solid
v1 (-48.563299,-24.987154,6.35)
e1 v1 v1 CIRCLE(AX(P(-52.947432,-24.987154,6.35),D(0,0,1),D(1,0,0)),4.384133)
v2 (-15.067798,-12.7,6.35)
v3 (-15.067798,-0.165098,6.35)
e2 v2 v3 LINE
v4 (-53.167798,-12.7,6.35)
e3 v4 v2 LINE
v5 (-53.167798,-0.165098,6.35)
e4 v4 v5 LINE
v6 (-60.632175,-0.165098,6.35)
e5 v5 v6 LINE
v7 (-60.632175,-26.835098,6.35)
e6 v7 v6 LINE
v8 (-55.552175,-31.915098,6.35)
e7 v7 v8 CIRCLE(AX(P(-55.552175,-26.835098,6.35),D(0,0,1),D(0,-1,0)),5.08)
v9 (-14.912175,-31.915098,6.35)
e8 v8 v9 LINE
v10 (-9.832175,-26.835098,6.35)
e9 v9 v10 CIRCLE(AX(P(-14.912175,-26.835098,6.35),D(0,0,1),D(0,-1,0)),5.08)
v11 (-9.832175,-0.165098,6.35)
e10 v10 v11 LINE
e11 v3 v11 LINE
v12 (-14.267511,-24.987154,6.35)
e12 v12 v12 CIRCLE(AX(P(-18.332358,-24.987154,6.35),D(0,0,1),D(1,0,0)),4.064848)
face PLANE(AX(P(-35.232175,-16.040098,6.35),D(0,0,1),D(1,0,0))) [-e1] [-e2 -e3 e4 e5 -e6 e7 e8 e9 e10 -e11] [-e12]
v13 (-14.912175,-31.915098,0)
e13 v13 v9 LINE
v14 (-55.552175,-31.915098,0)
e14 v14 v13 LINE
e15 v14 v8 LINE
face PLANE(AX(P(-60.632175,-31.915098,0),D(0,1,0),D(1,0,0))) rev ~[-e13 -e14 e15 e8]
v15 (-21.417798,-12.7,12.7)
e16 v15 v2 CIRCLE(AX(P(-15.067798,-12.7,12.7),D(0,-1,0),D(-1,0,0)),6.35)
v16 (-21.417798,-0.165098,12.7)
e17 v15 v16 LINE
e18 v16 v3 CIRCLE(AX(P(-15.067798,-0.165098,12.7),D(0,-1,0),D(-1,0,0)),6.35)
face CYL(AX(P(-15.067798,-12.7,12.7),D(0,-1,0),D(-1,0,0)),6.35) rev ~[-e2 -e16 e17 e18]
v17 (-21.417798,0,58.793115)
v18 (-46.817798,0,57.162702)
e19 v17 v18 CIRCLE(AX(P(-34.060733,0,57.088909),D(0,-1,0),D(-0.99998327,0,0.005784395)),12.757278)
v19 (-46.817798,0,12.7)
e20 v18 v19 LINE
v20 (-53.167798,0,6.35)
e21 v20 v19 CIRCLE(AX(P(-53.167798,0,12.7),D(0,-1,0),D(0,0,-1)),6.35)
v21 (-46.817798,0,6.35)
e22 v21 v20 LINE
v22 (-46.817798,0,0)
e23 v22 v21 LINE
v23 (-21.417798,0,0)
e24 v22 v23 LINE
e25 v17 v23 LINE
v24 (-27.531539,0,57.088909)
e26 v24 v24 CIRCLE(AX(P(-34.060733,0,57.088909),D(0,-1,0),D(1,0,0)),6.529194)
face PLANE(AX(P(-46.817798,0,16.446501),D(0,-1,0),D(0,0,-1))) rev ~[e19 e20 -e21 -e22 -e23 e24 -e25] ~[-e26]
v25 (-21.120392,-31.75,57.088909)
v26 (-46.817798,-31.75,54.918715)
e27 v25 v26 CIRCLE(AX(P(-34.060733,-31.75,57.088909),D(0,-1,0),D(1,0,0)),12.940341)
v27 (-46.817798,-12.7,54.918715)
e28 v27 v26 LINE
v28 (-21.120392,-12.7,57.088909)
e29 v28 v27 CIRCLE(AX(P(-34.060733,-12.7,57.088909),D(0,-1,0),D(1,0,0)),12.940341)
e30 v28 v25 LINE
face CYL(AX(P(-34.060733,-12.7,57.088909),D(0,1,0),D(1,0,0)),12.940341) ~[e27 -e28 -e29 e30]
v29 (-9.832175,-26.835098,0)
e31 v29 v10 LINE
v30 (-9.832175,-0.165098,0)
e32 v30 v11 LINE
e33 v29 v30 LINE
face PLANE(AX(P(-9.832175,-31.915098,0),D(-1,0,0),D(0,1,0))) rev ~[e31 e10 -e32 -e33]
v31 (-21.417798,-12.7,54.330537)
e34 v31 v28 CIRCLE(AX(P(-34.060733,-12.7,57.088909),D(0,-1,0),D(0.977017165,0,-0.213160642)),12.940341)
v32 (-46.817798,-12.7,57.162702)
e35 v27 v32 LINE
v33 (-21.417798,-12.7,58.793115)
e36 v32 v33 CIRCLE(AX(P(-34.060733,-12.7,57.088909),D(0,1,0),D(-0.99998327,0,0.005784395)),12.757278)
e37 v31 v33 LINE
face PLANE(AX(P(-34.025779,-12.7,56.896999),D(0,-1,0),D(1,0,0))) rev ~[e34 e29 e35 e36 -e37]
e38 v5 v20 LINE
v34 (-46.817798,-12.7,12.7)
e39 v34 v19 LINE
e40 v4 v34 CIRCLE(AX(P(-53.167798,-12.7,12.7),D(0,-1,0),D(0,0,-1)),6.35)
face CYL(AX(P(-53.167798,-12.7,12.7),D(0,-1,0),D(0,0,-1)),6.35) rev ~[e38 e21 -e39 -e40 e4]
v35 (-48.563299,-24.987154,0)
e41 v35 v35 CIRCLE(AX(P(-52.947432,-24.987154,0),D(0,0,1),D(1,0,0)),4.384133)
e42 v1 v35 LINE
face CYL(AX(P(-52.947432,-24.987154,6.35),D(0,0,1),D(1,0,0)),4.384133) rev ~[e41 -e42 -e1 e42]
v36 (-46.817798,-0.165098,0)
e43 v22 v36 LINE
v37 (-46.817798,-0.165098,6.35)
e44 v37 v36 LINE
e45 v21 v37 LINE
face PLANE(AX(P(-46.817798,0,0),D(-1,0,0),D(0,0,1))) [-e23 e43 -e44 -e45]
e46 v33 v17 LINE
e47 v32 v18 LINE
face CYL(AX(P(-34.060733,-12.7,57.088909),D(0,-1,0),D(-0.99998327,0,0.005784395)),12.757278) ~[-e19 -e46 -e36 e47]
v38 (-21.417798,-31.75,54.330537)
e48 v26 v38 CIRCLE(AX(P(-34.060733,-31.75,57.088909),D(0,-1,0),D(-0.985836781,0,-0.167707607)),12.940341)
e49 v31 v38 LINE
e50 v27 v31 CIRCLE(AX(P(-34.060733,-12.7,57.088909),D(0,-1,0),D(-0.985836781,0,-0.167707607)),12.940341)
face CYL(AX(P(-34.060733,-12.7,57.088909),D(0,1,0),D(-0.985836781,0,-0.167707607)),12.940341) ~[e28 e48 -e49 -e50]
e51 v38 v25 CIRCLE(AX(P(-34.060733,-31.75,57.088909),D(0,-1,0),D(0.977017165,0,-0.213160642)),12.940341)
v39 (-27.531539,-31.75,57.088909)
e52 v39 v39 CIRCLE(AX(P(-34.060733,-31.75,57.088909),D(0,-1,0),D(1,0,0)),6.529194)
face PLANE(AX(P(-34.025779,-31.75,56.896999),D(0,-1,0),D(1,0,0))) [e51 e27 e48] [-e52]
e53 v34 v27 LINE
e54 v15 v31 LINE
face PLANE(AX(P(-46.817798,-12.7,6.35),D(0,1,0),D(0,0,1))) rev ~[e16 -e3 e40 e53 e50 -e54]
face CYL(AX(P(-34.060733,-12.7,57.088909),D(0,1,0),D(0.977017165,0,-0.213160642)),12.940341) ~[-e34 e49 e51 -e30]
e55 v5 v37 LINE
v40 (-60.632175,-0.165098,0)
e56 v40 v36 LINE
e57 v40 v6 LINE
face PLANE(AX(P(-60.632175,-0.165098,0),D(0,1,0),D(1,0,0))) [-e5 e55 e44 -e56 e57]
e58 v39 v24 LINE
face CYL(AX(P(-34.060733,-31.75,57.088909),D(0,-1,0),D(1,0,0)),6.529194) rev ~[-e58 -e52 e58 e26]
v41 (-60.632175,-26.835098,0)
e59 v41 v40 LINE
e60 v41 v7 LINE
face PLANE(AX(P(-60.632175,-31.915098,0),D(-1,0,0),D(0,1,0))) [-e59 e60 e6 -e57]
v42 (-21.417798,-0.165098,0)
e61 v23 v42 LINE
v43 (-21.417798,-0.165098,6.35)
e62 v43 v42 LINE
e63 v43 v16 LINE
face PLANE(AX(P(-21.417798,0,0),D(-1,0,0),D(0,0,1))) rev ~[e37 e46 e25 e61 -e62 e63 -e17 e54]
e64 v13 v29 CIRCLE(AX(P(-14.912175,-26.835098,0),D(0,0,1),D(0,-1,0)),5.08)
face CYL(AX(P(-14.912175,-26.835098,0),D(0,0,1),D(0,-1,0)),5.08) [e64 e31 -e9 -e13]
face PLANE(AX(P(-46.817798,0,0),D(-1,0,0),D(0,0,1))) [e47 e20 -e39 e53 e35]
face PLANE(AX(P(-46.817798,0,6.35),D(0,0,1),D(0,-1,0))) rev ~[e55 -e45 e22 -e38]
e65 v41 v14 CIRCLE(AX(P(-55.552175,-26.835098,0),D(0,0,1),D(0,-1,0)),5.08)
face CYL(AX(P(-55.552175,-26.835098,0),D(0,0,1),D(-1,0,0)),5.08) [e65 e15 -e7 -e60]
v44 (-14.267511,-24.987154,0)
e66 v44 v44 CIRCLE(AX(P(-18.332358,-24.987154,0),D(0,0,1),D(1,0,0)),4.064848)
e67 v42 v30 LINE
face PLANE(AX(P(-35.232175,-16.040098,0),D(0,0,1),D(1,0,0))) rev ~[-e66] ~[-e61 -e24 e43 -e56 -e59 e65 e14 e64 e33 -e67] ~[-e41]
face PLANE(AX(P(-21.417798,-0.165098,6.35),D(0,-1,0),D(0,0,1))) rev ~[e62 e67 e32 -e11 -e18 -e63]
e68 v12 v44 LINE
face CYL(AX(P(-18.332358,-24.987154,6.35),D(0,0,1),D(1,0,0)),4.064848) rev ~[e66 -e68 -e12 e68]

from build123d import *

# Parameters (mm, degrees)
F0_W      = 25.4
F0_H      = 69.85
F1_DEPTH  = 12.7
F3_DEPTH  = 12.701
F5_DEPTH  = 19.05
F6_R      = 6.5291939121
F7_DEPTH  = 31.751
F8_W      = 50.8
F8_H      = 31.75
F9_DEPTH  = 6.35
F10_R     = 4.3841328913
F10_R_2   = 4.0648477918
F11_DEPTH = 25.4
F13_DEPTH = 141
F14_R     = 5.08
F15_W     = 12.5349015713
F15_H     = 9.3853002578
F16_DEPTH = 12.7
F18_DEPTH = 25.4
F20_DEPTH = 12.7
F22_DEPTH = 25.4
F24_DEPTH = 25.4


# Not quite as in the source:
# - an extrude ends at something that could not be found from the text; its depth is read off the source's solid
# - a feature names something its author has since deleted; it is built from what else it names


with BuildPart() as f1:
    # F0 (on Front) → F1 (new body)
    with BuildSketch(Plane.XZ):
        with Locations((-34.1177975344, 34.925)):
            Rectangle(F0_W, F0_H)
    extrude(amount=F1_DEPTH)

    # F2 (on face) → F3 (cut, through all)
    with BuildSketch(Plane.XZ.offset(12.7)):
        with BuildLine():
            ThreePointArc((-46.8177975344, 57.1627020836), (-34.8779343498, 69.8199859011), (-21.4177975344, 58.7931149299))
            Line((-21.4177975344, 58.7931149299), (-21.4177975344, 69.85))
            Line((-21.4177975344, 69.85), (-46.8177975344, 69.85))
            Line((-46.8177975344, 69.85), (-46.8177975344, 57.1627020836))
        make_face()
    extrude(amount=-F3_DEPTH, mode=Mode.SUBTRACT)

    # F4 (on face) → F5 (join)
    with BuildSketch(Plane.XZ.offset(12.7)):
        with BuildLine():
            Line((-46.8177975344, 57.1627020836), (-46.8177975344, 54.9187152869))
            ThreePointArc((-46.8177975344, 54.9187152869), (-34.3603071914, 44.1520357407), (-21.4177975344, 54.3305374906))
            Line((-21.4177975344, 54.3305374906), (-21.4177975344, 58.7931149299))
            ThreePointArc((-21.4177975344, 58.7931149299), (-34.8779343498, 69.8199859011), (-46.8177975344, 57.1627020836))
        make_face()
        with BuildLine():
            ThreePointArc((-21.4177975344, 54.3305374906), (-21.194958074, 55.7017298658), (-21.1203918045, 57.0889089552))
            ThreePointArc((-21.1203918045, 57.0889089552), (-35.1496925912, 69.9833496353), (-46.8177975344, 54.9187152869))
            Line((-46.8177975344, 54.9187152869), (-46.8177975344, 57.1627020836))
            ThreePointArc((-46.8177975344, 57.1627020836), (-34.8779343498, 69.8199859011), (-21.4177975344, 58.7931149299))
            Line((-21.4177975344, 58.7931149299), (-21.4177975344, 54.3305374906))
        make_face()
    extrude(amount=F5_DEPTH)

    # F6 (on face) → F7 (cut, through all)
    with BuildSketch(Plane.XZ.offset(31.75)):
        with Locations((-34.0607331136, 57.0889089552)):
            Circle(F6_R)
    extrude(amount=-F7_DEPTH, mode=Mode.SUBTRACT)

    # F8 (on Top) → F9 (join)
    with BuildSketch(Plane.XY):
        with Locations((-35.2321754485, -16.0400984287)):
            Rectangle(F8_W, F8_H)
    extrude(amount=F9_DEPTH)

    # F10 (on face) → F11 (cut)
    with BuildSketch(Plane.XY.offset(6.35)):
        with Locations((-52.9474318027, -24.9871537089)):
            Circle(F10_R)
        with Locations((-18.3323584497, -24.9871537089)):
            Circle(F10_R_2)
    extrude(amount=-F11_DEPTH, mode=Mode.SUBTRACT)

    # F12 (on Front) → F13 (cut, through all)
    with BuildSketch(Plane.XZ):
        with BuildLine():
            ThreePointArc((-47.1297007382, 13.1953000858), (-48.9895726777, 17.6854281464), (-53.4797007382, 19.5453000858))
            ThreePointArc((-53.4797007382, 19.5453000858), (-57.9698287987, 17.6854281464), (-59.8297007382, 13.1953000858))
            ThreePointArc((-59.8297007382, 13.1953000858), (-57.9698287987, 8.7051720253), (-53.4797007382, 6.8453000858))
            ThreePointArc((-53.4797007382, 6.8453000858), (-48.9895726777, 8.7051720253), (-47.1297007382, 13.1953000858))
        make_face()
        with BuildLine():
            ThreePointArc((-59.8297007382, 13.1953000858), (-57.9698287987, 17.6854281464), (-53.4797007382, 19.5453000858))
            Line((-53.4797007382, 19.5453000858), (-59.8297007382, 19.5453000858))
            Line((-59.8297007382, 19.5453000858), (-59.8297007382, 13.1953000858))
        make_face()
        with BuildLine():
            ThreePointArc((-53.4797007382, 6.8453000858), (-57.9698287987, 8.7051720253), (-59.8297007382, 13.1953000858))
            Line((-59.8297007382, 13.1953000858), (-59.8297007382, 6.8453000858))
            Line((-59.8297007382, 6.8453000858), (-53.4797007382, 6.8453000858))
        make_face()
        with BuildLine():
            Line((-47.1297007382, 13.1953000858), (-47.1297007382, 19.5453000858))
            Line((-47.1297007382, 19.5453000858), (-53.4797007382, 19.5453000858))
            ThreePointArc((-53.4797007382, 19.5453000858), (-48.9895726777, 17.6854281464), (-47.1297007382, 13.1953000858))
        make_face()
        with BuildLine():
            ThreePointArc((-8.7253203213, 12.5349001028), (-14.8973108068, 18.7068905883), (-21.0693012923, 12.5349001028))
            ThreePointArc((-21.0693012923, 12.5349001028), (-19.2615671325, 8.170643777), (-14.8973108068, 6.3629096172))
            ThreePointArc((-14.8973108068, 6.3629096172), (-10.533054481, 8.170643777), (-8.7253203213, 12.5349001028))
        make_face()
    extrude(amount=-F13_DEPTH, mode=Mode.SUBTRACT)

    # F14
    f14_edges = [f1.edges().sort_by_distance(p)[0] for p in [
        (-9.832175, -31.915098, 3.175),
        (-60.632175, -31.915098, 3.175),
    ]]
    fillet(f14_edges, radius=F14_R)

    # F15 (on face) → F16 (join)
    with BuildSketch(Plane.YZ.offset(-21.4177975344)):
        with Locations((-6.4325492144, 11.0426501289)):
            Rectangle(F15_W, F15_H)
    extrude(amount=F16_DEPTH)

    # F17 (on face) → F18 (cut)
    with BuildSketch(Plane.XZ.offset(12.7)):
        with BuildLine():
            ThreePointArc((-20.6453823473, 15.7353002578), (-21.221664756, 14.2660198655), (-21.4177975344, 12.7))
            ThreePointArc((-21.4177975344, 12.7), (-19.5579255949, 8.2098719395), (-15.0677975344, 6.35))
            ThreePointArc((-15.0677975344, 6.35), (-10.5776694739, 8.2098719395), (-8.7177975344, 12.7))
            ThreePointArc((-8.7177975344, 12.7), (-8.9139303128, 14.2660198655), (-9.4902127215, 15.7353002578))
            Line((-9.4902127215, 15.7353002578), (-20.6453823473, 15.7353002578))
        make_face()
        with BuildLine():
            ThreePointArc((-9.4902127215, 15.7353002578), (-15.0677975344, 19.05), (-20.6453823473, 15.7353002578))
            Line((-20.6453823473, 15.7353002578), (-9.4902127215, 15.7353002578))
        make_face()
        with BuildLine():
            ThreePointArc((-8.7177975344, 12.7), (-10.5776694739, 8.2098719395), (-15.0677975344, 6.35))
            Line((-15.0677975344, 6.35), (-9.8321754485, 6.35))
            Line((-9.8321754485, 6.35), (-8.7177975344, 6.35))
            Line((-8.7177975344, 6.35), (-8.7177975344, 12.7))
        make_face()
        with BuildLine():
            Line((-8.7177975344, 15.7353002578), (-9.4902127215, 15.7353002578))
            ThreePointArc((-9.4902127215, 15.7353002578), (-8.9139303128, 14.2660198655), (-8.7177975344, 12.7))
            Line((-8.7177975344, 12.7), (-8.7177975344, 15.7353002578))
        make_face()
    extrude(amount=-F18_DEPTH, mode=Mode.SUBTRACT)

    # F19 (on face) → F20 (join)
    with BuildSketch(Plane(origin=(-46.8177975344, 0, 0), x_dir=(0, -1, 0), z_dir=(-1, 0, 0))):
        Polygon((12.7, 16.4465010166), (0, 16.4465010166), (0, 6.35), (0.1650984287, 6.35), (12.7, 6.35), align=None)
    extrude(amount=F20_DEPTH)

    # F21 (on face) → F22 (cut)
    with BuildSketch(Plane.XZ.offset(12.7)):
        with BuildLine():
            Line((-59.5177975344, 6.35), (-53.1677975344, 6.35))
            ThreePointArc((-53.1677975344, 6.35), (-57.6579255949, 8.2098719395), (-59.5177975344, 12.7))
            Line((-59.5177975344, 12.7), (-59.5177975344, 6.35))
        make_face()
        with BuildLine():
            Line((-21.4177975344, 15.7353002578), (-21.4177975344, 12.7))
            ThreePointArc((-21.4177975344, 12.7), (-21.221664756, 14.2660198655), (-20.6453823473, 15.7353002578))
            Line((-20.6453823473, 15.7353002578), (-21.4177975344, 15.7353002578))
        make_face()
        with BuildLine():
            ThreePointArc((-59.5177975344, 12.7), (-59.204311952, 14.6705313207), (-58.2948073971, 16.4465010166))
            Line((-58.2948073971, 16.4465010166), (-59.5177975344, 16.4465010166))
            Line((-59.5177975344, 16.4465010166), (-59.5177975344, 12.7))
        make_face()
        with BuildLine():
            Line((-58.2948073971, 16.4465010166), (-48.0407876717, 16.4465010166))
            ThreePointArc((-48.0407876717, 16.4465010166), (-53.1677975344, 19.05), (-58.2948073971, 16.4465010166))
        make_face()
        with BuildLine():
            ThreePointArc((-53.1677975344, 6.35), (-48.6776694739, 8.2098719395), (-46.8177975344, 12.7))
            ThreePointArc((-46.8177975344, 12.7), (-47.1312831168, 14.6705313207), (-48.0407876717, 16.4465010166))
            Line((-48.0407876717, 16.4465010166), (-58.2948073971, 16.4465010166))
            ThreePointArc((-58.2948073971, 16.4465010166), (-59.204311952, 14.6705313207), (-59.5177975344, 12.7))
            ThreePointArc((-59.5177975344, 12.7), (-57.6579255949, 8.2098719395), (-53.1677975344, 6.35))
        make_face()
    extrude(amount=-F22_DEPTH, mode=Mode.SUBTRACT)

    # F23 (on face) → F24 (cut)
    with BuildSketch(Plane.XZ.offset(12.7)):
        with BuildLine():
            Line((-46.8177975344, 12.7), (-46.8177975344, 16.4465010166))
            Line((-46.8177975344, 16.4465010166), (-48.0407876717, 16.4465010166))
            ThreePointArc((-48.0407876717, 16.4465010166), (-47.1312831168, 14.6705313207), (-46.8177975344, 12.7))
        make_face()
    extrude(amount=-F24_DEPTH, mode=Mode.SUBTRACT)


solid = f1.part
